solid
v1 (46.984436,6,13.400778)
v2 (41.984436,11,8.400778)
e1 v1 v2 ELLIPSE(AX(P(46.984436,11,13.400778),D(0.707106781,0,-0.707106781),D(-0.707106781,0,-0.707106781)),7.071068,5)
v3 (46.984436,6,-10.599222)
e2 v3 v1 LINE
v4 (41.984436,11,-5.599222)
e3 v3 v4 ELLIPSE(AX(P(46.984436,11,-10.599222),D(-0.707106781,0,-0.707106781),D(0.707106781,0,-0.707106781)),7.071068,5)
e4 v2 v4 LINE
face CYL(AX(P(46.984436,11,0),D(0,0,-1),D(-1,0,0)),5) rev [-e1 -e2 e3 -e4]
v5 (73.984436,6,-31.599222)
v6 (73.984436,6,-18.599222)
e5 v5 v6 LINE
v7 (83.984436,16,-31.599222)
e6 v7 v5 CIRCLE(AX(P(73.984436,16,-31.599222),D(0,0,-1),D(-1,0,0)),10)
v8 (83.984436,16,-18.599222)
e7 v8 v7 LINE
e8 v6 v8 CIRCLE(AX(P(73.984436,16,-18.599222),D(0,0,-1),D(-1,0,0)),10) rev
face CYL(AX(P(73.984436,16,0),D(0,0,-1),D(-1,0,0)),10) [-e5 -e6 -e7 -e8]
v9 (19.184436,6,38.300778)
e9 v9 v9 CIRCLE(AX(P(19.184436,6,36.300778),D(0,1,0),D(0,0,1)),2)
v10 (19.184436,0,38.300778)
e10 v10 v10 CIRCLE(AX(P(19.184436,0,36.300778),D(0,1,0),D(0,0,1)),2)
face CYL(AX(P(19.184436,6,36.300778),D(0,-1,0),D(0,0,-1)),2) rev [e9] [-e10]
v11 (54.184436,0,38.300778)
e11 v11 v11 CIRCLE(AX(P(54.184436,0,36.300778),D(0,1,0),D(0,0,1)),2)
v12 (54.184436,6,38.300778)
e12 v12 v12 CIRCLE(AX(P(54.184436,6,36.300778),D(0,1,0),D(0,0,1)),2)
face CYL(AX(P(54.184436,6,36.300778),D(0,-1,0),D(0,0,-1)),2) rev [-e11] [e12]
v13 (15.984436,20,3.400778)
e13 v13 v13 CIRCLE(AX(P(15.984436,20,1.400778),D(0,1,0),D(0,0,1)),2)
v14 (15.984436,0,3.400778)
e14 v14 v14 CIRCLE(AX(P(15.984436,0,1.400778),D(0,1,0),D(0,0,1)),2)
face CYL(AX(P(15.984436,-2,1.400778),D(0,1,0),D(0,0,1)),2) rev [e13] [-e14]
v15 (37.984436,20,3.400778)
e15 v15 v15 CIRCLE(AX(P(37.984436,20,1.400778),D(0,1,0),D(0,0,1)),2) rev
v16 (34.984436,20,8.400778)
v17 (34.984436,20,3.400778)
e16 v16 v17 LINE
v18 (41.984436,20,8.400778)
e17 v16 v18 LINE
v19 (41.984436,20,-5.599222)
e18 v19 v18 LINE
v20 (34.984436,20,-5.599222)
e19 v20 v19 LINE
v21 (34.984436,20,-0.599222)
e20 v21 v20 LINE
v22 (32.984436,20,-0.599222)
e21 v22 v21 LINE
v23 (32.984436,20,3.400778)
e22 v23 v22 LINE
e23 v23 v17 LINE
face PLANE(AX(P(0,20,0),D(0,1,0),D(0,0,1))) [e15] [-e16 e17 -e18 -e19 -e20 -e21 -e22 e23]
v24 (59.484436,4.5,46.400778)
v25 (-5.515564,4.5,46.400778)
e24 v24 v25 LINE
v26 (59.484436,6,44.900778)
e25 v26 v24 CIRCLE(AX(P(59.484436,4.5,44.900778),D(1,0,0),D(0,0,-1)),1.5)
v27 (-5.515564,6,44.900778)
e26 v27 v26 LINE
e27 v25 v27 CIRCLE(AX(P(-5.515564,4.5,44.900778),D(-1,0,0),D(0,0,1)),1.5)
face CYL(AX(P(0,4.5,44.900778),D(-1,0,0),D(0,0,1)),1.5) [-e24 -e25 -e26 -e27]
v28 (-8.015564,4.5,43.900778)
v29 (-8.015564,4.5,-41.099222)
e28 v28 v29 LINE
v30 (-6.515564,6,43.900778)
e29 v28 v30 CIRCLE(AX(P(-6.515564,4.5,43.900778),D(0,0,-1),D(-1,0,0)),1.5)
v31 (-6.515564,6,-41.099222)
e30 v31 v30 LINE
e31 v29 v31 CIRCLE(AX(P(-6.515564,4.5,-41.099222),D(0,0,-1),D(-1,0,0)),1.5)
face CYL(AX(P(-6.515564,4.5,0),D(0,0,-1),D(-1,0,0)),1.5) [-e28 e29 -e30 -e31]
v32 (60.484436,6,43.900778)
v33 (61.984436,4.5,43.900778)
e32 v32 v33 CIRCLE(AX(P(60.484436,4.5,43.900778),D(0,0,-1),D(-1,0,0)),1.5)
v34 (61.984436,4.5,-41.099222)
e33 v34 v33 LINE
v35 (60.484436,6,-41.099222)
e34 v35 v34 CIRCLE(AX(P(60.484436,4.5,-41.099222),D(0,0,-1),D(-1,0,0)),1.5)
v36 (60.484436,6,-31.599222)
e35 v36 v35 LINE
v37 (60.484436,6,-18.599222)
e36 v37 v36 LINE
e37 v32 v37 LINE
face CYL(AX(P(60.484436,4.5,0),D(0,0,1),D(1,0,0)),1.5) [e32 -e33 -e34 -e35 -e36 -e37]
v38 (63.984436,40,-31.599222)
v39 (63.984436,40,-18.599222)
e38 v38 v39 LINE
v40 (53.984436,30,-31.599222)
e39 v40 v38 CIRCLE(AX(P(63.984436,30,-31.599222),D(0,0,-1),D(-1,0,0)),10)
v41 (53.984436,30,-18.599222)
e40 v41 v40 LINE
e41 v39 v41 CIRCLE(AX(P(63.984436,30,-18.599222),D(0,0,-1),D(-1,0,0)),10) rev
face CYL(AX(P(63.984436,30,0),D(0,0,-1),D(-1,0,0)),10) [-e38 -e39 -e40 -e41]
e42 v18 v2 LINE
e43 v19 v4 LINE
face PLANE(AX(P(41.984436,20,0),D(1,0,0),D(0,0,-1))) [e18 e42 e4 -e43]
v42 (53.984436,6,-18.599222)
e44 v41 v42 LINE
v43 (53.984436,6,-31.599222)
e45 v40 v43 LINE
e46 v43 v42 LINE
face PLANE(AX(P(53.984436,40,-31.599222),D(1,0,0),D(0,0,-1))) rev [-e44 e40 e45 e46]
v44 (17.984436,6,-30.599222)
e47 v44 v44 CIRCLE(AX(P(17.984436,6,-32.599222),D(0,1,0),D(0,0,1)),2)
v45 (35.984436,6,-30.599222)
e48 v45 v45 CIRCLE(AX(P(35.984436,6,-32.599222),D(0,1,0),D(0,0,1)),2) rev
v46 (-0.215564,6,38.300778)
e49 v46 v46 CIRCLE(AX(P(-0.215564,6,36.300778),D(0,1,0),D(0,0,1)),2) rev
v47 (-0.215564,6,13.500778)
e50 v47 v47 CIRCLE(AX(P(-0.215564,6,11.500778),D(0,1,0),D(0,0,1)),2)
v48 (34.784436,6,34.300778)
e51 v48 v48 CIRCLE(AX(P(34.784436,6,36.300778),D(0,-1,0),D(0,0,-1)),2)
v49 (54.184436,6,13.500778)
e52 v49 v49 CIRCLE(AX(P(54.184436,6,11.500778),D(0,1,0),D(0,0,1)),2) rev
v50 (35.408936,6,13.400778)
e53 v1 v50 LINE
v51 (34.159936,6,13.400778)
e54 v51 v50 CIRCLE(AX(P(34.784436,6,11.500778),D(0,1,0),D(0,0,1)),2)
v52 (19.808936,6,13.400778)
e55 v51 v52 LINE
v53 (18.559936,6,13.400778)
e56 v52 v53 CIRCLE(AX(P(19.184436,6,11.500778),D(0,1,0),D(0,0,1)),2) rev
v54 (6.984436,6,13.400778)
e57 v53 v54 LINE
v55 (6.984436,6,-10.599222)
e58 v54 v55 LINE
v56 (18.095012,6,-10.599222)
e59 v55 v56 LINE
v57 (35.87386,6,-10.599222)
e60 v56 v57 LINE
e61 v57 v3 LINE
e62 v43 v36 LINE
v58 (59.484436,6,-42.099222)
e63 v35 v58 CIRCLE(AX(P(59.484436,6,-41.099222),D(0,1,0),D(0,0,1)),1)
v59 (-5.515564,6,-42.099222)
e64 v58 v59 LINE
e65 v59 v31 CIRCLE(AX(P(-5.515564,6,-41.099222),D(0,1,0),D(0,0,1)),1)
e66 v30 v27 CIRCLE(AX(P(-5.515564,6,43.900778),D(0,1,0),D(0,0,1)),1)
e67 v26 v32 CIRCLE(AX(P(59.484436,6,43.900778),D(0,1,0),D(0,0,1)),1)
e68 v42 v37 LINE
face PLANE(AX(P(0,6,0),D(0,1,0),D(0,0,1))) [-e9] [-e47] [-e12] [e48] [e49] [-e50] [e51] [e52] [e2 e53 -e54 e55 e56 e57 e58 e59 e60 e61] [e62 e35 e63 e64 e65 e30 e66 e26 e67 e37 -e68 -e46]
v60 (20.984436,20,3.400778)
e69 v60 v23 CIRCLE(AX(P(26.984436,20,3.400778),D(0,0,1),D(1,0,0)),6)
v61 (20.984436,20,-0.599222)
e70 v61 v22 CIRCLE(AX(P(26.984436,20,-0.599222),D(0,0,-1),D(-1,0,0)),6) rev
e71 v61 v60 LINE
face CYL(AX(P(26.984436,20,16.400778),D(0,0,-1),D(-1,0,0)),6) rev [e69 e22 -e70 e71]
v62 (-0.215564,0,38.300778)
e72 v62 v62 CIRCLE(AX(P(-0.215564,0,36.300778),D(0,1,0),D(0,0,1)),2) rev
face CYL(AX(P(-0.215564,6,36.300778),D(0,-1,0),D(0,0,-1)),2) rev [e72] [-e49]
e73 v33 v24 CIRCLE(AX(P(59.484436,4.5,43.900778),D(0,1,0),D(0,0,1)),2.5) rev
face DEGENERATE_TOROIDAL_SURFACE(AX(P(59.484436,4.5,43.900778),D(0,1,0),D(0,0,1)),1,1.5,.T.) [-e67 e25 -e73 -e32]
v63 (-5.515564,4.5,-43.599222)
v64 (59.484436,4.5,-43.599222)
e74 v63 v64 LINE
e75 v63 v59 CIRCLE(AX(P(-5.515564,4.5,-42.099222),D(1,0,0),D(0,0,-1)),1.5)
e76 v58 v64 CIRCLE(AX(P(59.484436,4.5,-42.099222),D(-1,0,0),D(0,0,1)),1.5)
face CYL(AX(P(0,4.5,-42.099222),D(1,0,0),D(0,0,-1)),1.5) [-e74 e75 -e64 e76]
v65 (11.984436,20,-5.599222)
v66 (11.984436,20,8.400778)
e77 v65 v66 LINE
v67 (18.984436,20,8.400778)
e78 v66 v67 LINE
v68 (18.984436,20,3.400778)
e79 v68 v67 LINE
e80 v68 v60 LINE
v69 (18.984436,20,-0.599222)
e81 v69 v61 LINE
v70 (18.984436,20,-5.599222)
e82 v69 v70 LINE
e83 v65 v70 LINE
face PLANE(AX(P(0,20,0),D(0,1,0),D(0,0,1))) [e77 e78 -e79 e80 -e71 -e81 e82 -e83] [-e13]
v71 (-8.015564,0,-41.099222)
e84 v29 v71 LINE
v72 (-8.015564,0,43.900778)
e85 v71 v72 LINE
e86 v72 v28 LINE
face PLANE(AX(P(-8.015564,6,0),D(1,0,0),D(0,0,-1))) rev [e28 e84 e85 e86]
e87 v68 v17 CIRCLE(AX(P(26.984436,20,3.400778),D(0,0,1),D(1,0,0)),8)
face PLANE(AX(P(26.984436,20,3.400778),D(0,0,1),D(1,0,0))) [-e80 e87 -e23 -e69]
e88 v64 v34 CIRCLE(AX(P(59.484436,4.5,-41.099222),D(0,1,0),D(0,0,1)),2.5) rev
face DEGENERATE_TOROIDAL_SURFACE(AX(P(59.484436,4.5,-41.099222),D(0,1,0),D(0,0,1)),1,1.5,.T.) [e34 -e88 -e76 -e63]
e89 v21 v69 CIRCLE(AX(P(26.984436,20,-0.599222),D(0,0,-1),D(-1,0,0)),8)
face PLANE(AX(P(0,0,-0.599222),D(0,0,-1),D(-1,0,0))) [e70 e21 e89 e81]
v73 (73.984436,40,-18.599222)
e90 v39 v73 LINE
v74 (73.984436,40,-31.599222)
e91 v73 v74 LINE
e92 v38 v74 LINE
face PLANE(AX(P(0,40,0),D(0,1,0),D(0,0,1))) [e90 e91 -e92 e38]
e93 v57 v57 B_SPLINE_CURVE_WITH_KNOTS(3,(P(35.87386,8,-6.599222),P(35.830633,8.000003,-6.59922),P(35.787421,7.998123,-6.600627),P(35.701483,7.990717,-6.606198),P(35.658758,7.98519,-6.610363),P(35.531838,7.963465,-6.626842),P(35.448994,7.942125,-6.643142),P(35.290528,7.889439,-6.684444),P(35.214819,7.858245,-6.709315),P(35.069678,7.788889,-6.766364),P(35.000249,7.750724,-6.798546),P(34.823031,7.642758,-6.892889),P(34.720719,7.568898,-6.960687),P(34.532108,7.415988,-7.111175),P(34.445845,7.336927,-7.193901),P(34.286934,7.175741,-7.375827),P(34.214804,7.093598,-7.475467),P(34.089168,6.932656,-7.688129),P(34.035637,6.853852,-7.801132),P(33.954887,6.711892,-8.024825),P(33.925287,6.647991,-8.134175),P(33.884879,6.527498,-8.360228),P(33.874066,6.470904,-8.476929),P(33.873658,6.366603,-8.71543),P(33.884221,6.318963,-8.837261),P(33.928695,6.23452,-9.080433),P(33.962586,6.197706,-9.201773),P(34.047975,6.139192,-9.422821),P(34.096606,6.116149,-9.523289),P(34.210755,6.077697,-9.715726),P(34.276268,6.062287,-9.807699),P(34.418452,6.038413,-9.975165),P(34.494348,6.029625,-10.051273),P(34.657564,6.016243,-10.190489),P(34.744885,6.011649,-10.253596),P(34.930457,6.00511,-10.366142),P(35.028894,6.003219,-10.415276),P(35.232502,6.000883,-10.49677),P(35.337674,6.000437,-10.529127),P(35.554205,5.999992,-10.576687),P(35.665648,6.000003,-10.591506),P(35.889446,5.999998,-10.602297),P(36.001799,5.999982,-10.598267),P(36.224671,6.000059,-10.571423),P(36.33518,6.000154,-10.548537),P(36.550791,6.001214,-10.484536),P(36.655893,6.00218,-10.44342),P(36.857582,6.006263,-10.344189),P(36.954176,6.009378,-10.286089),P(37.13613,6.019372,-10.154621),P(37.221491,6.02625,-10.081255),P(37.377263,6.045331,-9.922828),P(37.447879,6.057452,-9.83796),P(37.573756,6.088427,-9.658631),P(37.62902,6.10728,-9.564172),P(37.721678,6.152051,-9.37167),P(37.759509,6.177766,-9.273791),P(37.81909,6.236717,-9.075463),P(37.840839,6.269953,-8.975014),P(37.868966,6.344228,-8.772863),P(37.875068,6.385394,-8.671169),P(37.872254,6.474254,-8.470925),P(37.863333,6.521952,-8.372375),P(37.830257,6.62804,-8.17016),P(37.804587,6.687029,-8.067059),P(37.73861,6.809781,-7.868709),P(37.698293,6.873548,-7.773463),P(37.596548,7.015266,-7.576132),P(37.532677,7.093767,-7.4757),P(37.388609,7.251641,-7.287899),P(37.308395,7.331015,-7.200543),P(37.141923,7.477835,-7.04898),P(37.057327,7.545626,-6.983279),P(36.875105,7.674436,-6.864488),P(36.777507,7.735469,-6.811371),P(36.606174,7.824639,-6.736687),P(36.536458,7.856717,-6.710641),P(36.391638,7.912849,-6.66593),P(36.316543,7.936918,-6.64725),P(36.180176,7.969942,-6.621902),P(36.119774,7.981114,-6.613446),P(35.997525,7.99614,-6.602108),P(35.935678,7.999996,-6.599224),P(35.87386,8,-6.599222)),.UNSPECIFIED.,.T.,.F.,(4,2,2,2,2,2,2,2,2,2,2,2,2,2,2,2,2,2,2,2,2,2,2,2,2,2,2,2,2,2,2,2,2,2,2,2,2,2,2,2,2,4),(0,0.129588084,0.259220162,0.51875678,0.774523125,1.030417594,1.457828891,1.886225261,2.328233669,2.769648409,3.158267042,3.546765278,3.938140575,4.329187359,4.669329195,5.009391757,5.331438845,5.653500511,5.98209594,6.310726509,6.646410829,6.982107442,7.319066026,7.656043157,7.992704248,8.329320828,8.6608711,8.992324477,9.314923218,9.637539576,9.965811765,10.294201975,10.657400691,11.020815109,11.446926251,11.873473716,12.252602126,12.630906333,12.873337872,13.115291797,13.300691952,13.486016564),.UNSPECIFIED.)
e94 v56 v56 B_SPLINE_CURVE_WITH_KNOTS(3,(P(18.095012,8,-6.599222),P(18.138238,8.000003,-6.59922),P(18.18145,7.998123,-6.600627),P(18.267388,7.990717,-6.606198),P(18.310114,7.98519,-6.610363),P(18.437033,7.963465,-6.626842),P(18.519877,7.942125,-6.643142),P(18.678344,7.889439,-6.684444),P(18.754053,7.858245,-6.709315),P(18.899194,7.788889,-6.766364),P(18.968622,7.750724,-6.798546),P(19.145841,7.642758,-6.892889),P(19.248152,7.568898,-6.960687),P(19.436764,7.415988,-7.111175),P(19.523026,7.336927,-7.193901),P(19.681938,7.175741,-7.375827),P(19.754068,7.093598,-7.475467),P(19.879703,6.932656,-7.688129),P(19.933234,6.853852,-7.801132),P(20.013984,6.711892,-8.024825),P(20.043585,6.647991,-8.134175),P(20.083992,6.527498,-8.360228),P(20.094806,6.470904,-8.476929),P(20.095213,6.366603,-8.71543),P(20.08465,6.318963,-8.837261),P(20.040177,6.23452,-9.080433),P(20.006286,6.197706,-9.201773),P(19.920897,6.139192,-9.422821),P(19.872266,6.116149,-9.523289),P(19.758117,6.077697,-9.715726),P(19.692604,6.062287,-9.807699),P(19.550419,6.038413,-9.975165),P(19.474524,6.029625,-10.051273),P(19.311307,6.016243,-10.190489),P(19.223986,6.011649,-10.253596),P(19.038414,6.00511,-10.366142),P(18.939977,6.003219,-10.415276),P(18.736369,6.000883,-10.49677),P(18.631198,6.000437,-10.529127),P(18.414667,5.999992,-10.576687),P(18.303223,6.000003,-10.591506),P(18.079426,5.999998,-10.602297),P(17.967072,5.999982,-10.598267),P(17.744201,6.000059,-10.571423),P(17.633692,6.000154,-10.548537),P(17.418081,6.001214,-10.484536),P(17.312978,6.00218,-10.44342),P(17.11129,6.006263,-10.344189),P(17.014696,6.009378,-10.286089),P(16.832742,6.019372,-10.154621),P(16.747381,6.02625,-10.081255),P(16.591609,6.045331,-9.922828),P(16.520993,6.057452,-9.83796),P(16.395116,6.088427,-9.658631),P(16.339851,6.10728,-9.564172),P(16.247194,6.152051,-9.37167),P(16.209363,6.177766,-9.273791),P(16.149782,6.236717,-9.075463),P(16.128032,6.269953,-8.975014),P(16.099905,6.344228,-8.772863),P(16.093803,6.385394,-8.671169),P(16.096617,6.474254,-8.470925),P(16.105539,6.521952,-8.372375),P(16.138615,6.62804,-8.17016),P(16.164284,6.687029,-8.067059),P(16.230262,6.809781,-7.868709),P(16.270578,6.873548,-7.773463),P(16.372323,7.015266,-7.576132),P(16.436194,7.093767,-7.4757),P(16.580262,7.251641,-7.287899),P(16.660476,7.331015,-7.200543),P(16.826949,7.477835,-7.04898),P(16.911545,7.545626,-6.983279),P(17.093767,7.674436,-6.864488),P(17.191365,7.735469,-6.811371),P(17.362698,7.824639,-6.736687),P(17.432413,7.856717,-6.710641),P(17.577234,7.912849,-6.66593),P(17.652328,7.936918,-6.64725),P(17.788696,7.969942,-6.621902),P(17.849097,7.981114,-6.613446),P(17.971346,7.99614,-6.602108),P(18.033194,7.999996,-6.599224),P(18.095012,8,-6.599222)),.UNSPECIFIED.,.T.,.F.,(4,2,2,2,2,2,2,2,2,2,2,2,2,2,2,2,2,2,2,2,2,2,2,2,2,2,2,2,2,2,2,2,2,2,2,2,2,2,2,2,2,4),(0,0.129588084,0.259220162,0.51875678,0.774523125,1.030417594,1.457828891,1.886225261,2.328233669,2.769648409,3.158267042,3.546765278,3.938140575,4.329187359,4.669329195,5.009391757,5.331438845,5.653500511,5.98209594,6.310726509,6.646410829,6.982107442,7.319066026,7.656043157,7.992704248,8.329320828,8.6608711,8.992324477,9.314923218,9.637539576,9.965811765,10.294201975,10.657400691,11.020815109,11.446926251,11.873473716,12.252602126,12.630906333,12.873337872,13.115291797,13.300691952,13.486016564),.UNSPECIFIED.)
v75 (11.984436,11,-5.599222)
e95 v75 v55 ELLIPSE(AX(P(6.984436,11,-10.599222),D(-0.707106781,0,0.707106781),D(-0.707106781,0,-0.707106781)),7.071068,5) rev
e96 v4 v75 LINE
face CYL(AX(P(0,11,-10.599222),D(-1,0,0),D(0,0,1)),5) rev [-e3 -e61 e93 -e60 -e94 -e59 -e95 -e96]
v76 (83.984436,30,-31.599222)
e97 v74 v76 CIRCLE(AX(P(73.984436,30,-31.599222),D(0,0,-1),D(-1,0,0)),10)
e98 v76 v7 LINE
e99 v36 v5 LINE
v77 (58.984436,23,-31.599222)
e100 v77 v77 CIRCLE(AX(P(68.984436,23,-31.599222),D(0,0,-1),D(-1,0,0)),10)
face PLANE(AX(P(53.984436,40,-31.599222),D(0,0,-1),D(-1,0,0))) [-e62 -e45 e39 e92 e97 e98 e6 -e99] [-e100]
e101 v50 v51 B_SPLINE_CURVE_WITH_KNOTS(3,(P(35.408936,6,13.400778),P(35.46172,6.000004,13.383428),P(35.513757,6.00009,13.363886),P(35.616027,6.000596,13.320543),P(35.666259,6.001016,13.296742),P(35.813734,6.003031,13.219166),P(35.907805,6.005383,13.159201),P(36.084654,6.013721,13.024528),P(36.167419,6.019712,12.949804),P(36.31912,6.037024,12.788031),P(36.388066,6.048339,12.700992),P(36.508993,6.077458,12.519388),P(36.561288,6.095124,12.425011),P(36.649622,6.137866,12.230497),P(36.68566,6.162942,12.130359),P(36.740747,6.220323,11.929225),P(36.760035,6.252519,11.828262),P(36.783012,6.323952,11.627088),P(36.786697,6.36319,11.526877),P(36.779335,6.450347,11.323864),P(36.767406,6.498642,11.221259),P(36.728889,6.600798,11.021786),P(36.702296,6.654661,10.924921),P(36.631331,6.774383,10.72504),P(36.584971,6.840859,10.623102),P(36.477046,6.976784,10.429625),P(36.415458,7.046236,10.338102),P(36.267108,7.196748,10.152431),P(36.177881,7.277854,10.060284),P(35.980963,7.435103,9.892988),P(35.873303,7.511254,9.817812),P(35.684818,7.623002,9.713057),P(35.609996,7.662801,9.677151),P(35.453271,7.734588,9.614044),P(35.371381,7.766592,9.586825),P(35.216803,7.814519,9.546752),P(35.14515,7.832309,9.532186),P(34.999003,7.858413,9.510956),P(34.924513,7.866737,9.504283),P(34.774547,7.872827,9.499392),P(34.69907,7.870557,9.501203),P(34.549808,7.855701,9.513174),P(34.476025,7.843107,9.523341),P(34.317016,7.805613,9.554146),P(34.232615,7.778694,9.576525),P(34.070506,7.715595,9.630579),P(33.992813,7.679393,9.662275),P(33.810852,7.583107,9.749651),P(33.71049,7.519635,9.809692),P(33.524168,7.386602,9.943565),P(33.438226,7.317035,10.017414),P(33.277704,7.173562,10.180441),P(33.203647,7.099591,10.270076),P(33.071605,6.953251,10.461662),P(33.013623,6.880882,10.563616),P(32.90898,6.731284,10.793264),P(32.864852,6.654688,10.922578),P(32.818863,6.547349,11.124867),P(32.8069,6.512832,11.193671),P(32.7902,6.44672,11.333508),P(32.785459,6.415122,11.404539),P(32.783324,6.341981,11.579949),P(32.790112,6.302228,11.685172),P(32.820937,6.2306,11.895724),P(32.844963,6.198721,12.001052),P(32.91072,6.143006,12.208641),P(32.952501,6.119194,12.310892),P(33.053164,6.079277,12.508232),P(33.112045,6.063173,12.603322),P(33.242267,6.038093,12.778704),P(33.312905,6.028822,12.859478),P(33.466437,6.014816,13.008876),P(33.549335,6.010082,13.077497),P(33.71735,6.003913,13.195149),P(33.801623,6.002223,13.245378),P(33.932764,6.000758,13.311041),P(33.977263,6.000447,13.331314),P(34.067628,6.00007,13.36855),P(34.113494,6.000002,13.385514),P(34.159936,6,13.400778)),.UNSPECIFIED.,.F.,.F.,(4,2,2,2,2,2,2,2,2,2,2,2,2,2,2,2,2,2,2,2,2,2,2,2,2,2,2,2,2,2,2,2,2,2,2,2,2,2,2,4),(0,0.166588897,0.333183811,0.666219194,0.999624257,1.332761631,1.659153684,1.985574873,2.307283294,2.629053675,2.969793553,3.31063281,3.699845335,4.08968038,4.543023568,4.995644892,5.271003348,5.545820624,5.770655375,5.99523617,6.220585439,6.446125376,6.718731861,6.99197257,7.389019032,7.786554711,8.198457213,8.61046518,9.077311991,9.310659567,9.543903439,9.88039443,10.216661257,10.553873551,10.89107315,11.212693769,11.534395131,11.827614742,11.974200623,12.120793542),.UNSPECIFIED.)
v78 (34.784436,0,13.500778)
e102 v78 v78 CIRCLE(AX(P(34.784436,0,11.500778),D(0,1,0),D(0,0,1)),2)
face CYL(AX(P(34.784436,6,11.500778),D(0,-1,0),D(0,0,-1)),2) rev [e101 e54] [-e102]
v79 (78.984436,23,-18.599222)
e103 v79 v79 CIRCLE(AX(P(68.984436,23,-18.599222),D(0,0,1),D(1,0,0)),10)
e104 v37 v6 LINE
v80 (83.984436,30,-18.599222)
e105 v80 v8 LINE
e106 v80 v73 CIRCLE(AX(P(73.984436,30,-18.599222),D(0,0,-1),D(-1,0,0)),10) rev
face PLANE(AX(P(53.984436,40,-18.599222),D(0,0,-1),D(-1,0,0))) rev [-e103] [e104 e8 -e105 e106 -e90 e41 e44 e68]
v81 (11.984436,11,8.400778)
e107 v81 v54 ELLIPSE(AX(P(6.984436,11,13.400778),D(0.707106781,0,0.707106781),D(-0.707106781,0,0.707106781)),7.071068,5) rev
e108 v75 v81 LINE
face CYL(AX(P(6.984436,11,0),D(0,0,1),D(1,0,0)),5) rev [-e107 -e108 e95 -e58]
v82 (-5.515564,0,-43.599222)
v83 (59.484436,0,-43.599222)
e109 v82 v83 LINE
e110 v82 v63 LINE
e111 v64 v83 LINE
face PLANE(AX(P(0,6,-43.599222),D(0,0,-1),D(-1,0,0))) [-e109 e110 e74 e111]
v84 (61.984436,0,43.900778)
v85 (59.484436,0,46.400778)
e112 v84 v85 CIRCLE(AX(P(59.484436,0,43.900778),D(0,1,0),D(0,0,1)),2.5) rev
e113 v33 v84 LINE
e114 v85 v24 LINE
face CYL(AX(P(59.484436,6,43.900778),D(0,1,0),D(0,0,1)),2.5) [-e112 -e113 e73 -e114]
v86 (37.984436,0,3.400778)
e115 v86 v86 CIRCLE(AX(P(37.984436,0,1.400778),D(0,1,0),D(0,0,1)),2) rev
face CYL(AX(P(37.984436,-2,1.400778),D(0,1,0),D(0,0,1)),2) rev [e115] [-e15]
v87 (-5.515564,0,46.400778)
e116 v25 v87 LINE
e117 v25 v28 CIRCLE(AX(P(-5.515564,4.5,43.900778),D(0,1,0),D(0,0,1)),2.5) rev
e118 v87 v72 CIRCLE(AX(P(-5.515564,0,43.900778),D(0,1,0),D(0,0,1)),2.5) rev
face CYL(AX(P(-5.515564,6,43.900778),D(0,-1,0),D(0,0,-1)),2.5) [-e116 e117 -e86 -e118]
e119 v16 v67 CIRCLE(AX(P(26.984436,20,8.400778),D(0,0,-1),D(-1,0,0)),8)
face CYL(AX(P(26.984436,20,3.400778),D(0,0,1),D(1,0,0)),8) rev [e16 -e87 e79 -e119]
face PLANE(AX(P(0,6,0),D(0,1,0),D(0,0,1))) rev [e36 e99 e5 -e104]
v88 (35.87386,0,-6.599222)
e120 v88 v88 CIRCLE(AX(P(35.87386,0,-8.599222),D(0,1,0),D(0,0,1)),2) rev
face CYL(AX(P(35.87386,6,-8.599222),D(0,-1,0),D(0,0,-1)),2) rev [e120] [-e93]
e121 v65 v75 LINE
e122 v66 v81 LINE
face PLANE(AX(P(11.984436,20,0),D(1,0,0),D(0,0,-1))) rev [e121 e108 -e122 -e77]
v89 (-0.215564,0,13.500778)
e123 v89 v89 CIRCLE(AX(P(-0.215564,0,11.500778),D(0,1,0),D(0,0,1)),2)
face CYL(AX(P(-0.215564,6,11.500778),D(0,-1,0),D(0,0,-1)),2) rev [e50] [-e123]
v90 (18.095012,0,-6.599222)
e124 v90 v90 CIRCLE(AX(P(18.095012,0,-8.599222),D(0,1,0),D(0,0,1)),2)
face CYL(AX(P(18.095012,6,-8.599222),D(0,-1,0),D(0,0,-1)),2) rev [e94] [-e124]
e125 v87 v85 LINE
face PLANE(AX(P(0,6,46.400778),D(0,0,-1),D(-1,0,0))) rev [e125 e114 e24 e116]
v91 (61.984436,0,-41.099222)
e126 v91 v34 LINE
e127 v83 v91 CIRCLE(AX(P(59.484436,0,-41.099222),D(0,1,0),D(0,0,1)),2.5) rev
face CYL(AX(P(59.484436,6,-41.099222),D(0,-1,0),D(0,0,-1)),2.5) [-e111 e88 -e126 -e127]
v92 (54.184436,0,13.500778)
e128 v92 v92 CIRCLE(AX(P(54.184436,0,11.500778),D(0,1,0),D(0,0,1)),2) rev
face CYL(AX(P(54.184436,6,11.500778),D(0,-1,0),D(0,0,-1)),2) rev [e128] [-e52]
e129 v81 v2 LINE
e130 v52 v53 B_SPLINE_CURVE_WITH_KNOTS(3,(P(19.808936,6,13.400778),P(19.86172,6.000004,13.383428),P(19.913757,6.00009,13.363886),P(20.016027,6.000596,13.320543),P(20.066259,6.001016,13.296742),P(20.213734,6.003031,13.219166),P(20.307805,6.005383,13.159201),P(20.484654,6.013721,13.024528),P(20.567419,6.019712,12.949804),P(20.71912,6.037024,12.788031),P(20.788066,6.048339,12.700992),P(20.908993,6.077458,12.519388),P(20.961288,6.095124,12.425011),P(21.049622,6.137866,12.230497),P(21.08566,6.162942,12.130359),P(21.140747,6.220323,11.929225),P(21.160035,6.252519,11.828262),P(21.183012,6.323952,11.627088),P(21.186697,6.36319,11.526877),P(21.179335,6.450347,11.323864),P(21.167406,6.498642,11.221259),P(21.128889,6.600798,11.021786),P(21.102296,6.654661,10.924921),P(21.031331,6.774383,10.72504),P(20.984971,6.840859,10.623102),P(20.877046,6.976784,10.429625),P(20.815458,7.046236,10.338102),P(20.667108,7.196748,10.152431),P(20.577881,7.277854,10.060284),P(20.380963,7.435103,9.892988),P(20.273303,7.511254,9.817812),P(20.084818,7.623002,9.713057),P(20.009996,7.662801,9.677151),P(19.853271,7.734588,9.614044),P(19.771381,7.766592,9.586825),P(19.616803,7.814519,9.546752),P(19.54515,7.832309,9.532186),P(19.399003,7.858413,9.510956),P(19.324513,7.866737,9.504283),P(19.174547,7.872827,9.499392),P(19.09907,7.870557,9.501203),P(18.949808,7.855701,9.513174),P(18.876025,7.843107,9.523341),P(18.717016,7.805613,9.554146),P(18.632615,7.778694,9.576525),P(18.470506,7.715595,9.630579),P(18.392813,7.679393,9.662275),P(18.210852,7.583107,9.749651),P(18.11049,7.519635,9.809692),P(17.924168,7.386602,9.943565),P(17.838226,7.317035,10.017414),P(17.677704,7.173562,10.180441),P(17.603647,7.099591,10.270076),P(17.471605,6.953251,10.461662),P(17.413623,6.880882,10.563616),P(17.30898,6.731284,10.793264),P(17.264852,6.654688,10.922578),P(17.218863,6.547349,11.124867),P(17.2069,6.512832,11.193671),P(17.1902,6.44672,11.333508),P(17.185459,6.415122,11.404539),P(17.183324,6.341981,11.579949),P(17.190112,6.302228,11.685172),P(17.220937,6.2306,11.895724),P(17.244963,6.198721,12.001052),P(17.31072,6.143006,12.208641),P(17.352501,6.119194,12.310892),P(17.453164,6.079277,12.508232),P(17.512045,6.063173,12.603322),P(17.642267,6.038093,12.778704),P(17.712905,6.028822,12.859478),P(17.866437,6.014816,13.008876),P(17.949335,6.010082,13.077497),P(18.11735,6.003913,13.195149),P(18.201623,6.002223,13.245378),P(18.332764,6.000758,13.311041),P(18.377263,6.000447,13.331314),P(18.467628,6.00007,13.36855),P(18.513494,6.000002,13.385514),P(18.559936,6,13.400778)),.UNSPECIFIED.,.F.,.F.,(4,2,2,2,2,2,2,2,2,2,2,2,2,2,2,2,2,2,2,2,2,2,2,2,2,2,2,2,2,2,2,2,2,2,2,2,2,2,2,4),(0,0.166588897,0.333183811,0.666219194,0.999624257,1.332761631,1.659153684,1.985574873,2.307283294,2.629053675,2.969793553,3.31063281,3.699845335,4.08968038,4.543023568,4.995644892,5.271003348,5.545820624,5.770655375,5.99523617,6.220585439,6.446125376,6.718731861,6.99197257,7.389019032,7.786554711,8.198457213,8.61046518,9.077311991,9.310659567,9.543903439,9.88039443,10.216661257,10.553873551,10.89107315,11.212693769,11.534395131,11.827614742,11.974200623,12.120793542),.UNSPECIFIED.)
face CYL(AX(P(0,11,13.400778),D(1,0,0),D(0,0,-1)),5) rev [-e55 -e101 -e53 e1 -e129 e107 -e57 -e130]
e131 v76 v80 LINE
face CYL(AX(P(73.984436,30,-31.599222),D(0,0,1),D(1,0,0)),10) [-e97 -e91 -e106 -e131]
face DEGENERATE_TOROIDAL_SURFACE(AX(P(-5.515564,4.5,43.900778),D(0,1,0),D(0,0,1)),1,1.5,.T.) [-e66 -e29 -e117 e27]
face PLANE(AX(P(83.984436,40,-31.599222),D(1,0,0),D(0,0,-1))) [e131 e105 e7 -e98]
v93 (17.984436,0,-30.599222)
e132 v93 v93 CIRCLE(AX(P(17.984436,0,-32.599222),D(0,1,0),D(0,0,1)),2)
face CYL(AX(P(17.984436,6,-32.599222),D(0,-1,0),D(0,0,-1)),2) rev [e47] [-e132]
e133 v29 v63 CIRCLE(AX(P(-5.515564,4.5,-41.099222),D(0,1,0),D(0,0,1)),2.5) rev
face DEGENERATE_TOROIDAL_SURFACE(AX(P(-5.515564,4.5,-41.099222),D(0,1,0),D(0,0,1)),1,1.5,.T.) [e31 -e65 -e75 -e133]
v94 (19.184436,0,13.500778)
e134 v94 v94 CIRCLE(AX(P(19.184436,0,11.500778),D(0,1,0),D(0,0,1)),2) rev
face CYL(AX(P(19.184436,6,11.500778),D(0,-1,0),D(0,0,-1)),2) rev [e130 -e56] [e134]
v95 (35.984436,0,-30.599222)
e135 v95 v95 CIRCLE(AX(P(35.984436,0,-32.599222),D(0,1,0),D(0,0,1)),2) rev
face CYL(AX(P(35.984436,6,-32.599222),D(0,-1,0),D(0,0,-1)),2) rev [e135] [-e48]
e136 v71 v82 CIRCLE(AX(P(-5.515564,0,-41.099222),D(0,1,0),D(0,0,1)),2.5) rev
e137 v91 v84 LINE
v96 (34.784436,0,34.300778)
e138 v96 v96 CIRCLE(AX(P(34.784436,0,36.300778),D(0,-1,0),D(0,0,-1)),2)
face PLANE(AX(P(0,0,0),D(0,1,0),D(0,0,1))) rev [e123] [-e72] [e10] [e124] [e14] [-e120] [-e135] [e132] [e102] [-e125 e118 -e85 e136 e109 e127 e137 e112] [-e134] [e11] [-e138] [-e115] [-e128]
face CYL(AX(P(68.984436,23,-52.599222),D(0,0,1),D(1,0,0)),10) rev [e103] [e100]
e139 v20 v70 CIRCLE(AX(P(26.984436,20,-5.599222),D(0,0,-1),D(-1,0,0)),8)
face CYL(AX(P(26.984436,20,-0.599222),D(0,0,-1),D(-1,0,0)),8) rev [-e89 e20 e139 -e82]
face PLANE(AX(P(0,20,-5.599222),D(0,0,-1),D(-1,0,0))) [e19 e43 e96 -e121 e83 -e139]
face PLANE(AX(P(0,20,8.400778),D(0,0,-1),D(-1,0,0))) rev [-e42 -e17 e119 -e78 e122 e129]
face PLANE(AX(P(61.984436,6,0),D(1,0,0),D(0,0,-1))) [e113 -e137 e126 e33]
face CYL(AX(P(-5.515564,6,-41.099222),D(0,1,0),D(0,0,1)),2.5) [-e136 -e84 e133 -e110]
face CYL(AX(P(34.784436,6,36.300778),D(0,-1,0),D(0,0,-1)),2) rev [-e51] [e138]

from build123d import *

# Parameters (mm, degrees)
SKETCH1_W           = 70
SKETCH1_H           = 90
SKETCH1_R           = 2
BOSS_EXTRUDE1_DEPTH = 6
SKETCH3_W           = 15
SKETCH3_H           = 7
BOSS_EXTRUDE2_DEPTH = 14
FILLET1_R           = 2.5
FILLET2_R           = 1.5
CUT_EXTRUDE1_DEPTH  = 22
SKETCH5_R           = 6
CUT_EXTRUDE2_DEPTH  = 22
CUT_EXTRUDE4_DEPTH  = 5
CUT_EXTRUDE5_START  = -5
SKETCH9_R           = 8
SKETCH9_R_2         = 6
CUT_EXTRUDE5_DEPTH  = 5
FILLET3_R           = 5
SKETCH10_W          = 30
SKETCH10_H          = 13
BOSS_EXTRUDE5_DEPTH = 34
CUT_EXTRUDE6_DEPTH  = 34
FILLET5_R           = 10


with BuildPart() as part:
    # Sketch1 → Boss-Extrude1 (new body)
    with BuildSketch(Plane(origin=(0, 0, 0), x_dir=(1, 0, 0), z_dir=(0, 1, 0))):
        with Locations((26.984435798, -1.40077821)):
            Rectangle(SKETCH1_W, SKETCH1_H)
        with Locations(Location((17.984435798, 32.59922179, 0), (0, 0, 270))):
            Circle(SKETCH1_R, mode=Mode.SUBTRACT)
        with Locations(Location((18.095011811, 8.59922179, 0), (0, 0, 270))):
            Circle(SKETCH1_R, mode=Mode.SUBTRACT)
        with Locations(Location((35.873859784, 8.59922179, 0), (0, 0, 270))):
            Circle(SKETCH1_R, mode=Mode.SUBTRACT)
        with Locations(Location((35.984435798, 32.59922179, 0), (0, 0, 270))):
            Circle(SKETCH1_R, mode=Mode.SUBTRACT)
        with Locations(Location((19.184435798, -11.50077821, 0), (0, 0, 270))):
            Circle(SKETCH1_R, mode=Mode.SUBTRACT)
        with Locations(Location((-0.215564202, -11.50077821, 0), (0, 0, 270))):
            Circle(SKETCH1_R, mode=Mode.SUBTRACT)
        with Locations(Location((-0.215564202, -36.30077821, 0), (0, 0, 270))):
            Circle(SKETCH1_R, mode=Mode.SUBTRACT)
        with Locations(Location((19.184435798, -36.30077821, 0), (0, 0, 270))):
            Circle(SKETCH1_R, mode=Mode.SUBTRACT)
        with Locations(Location((54.184435798, -36.30077821, 0), (0, 0, 270))):
            Circle(SKETCH1_R, mode=Mode.SUBTRACT)
        with Locations(Location((34.784435798, -36.30077821, 0), (0, 0, 90))):
            Circle(SKETCH1_R, mode=Mode.SUBTRACT)
        with Locations(Location((34.784435798, -11.50077821, 0), (0, 0, 270))):
            Circle(SKETCH1_R, mode=Mode.SUBTRACT)
        with Locations(Location((54.184435798, -11.50077821, 0), (0, 0, 270))):
            Circle(SKETCH1_R, mode=Mode.SUBTRACT)
    extrude(amount=BOSS_EXTRUDE1_DEPTH)

    # Sketch3 → Boss-Extrude2 (add)
    with BuildSketch(Plane(origin=(0, 6, 0), x_dir=(1, 0, 0), z_dir=(0, 1, 0))):
        with Locations((19.484435798, 2.09922179)):
            Rectangle(SKETCH3_W, SKETCH3_H)
        with Locations((34.484435798, 2.09922179)):
            Rectangle(SKETCH3_W, SKETCH3_H)
        with Locations((34.484435798, -4.90077821)):
            Rectangle(SKETCH3_W, SKETCH3_H)
        with Locations((19.484435798, -4.90077821)):
            Rectangle(SKETCH3_W, SKETCH3_H)
    extrude(amount=BOSS_EXTRUDE2_DEPTH)

    # Fillet1
    fillet1_edges = [part.edges().sort_by_distance(p)[0] for p in [
        (-8.015564202, 3, 46.40077821),
        (-8.015564202, 3, -43.59922179),
        (61.984435798, 3, -43.59922179),
        (61.984435798, 3, 46.40077821),
    ]]
    fillet(fillet1_edges, radius=FILLET1_R)

    # Fillet2
    fillet2_edges = [part.edges().sort_by_distance(p)[0] for p in [
        (-8.015564202, 6, 1.40077821),
        (26.984435798, 6, -43.59922179),
        (26.984435798, 6, 46.40077821),
        (61.984435798, 6, 1.40077821),
        (-7.283331155, 6, 45.668545163),
        (61.252202751, 6, 45.668545163),
        (61.252202751, 6, -42.866988743),
        (-7.283331155, 6, -42.866988743),
    ]]
    fillet(fillet2_edges, radius=FILLET2_R)

    # Sketch4 → Cut-Extrude1 (cut)
    with BuildSketch(Plane(origin=(0, 20, 0), x_dir=(1, 0, 0), z_dir=(0, 1, 0))):
        with BuildLine():
            ThreePointArc((17.984435798, -1.40077821), (15.984435798, 0.59922179), (13.984435798, -1.40077821))
            Line((13.984435798, -1.40077821), (17.984435798, -1.40077821))
        make_face()
        with BuildLine():
            Line((17.984435798, -1.40077821), (13.984435798, -1.40077821))
            ThreePointArc((13.984435798, -1.40077821), (15.984435798, -3.40077821), (17.984435798, -1.40077821))
        make_face()
        with BuildLine():
            ThreePointArc((39.984435798, -1.40077821), (37.984435798, 0.59922179), (35.984435798, -1.40077821))
            Line((35.984435798, -1.40077821), (39.984435798, -1.40077821))
        make_face()
        with BuildLine():
            Line((39.984435798, -1.40077821), (35.984435798, -1.40077821))
            ThreePointArc((35.984435798, -1.40077821), (37.984435798, -3.40077821), (39.984435798, -1.40077821))
        make_face()
    extrude(amount=-CUT_EXTRUDE1_DEPTH, mode=Mode.SUBTRACT)

    # Sketch5 → Cut-Extrude2 (cut)
    with BuildSketch(Plane(origin=(0, 0, -5.59922179), x_dir=(-1, 0, 0), z_dir=(0, 0, -1))):
        with Locations((-26.984435798, 20)):
            Circle(SKETCH5_R)
    extrude(amount=-CUT_EXTRUDE2_DEPTH, mode=Mode.SUBTRACT)

    # Sketch6 → Cut-Extrude4 (cut)
    with BuildSketch(Plane(origin=(0, 0, -5.59922179), x_dir=(-1, 0, 0), z_dir=(0, 0, -1))):
        with BuildLine():
            ThreePointArc((-34.984435798, 20), (-26.984435798, 12), (-18.984435798, 20))
            Line((-18.984435798, 20), (-20.984435798, 20))
            ThreePointArc((-20.984435798, 20), (-26.984435798, 14), (-32.984435798, 20))
            Line((-32.984435798, 20), (-34.984435798, 20))
        make_face()
    extrude(amount=-CUT_EXTRUDE4_DEPTH, mode=Mode.SUBTRACT)

    # Sketch9 → Cut-Extrude5 (cut)
    with BuildSketch(Plane.XY.offset(8.40077821).offset(CUT_EXTRUDE5_START)):
        with Locations((26.984435798, 20)):
            Circle(SKETCH9_R)
        with Locations((26.984435798, 20)):
            Circle(SKETCH9_R_2, mode=Mode.SUBTRACT)
    extrude(amount=CUT_EXTRUDE5_DEPTH, mode=Mode.SUBTRACT)

    # Fillet3
    # the kernel refuses this fillet: 5 mm, written as the material it adds along each edge
    with BuildSketch(Plane(origin=(41.984435798, 6, 8.40077821), x_dir=(0, 0, 1), z_dir=(-1, 0, 0))) as fillet3_piece_1_section:
        with BuildLine():
            CenterArc((FILLET3_R, FILLET3_R), FILLET3_R, 180, 90)
            Line((0, FILLET3_R), (0, 0))
            Line((0, 0), (FILLET3_R, 0))
        make_face()
    fillet3_piece_1 = extrude(amount=30, mode=Mode.PRIVATE)
    fillet3_piece_1 = fillet3_piece_1 - Plane(origin=(34.784435798, 7.197458463, 11.50077821), x_dir=(0, 0, 1), z_dir=(0, -1, 0)) * Cylinder(2, 80, mode=Mode.PRIVATE)
    fillet3_piece_1 = fillet3_piece_1 - Plane(origin=(19.184435798, 7.197458463, 11.50077821), x_dir=(0, 0, 1), z_dir=(0, -1, 0)) * Cylinder(2, 80, mode=Mode.PRIVATE)
    add(fillet3_piece_1)
    with BuildSketch(Plane(origin=(11.984435798, 6, -5.59922179), x_dir=(-1, 0, 0), z_dir=(0, 0, 1))) as fillet3_piece_2:
        with BuildLine():
            CenterArc((FILLET3_R, -FILLET3_R), FILLET3_R, 90, 90)
            Line((0, -FILLET3_R), (0, 0))
            Line((0, 0), (FILLET3_R, 0))
        make_face()
    extrude(amount=14)
    with BuildSketch(Plane(origin=(41.984435798, 6, -5.59922179), x_dir=(0, 0, -1), z_dir=(-1, 0, 0))) as fillet3_piece_3_section:
        with BuildLine():
            CenterArc((FILLET3_R, -FILLET3_R), FILLET3_R, 90, 90)
            Line((0, -FILLET3_R), (0, 0))
            Line((0, 0), (FILLET3_R, 0))
        make_face()
    fillet3_piece_3 = extrude(amount=30, mode=Mode.PRIVATE)
    fillet3_piece_3 = fillet3_piece_3 - Plane(origin=(35.873859784, 7.200103182, -8.59922179), x_dir=(0, 0, 1), z_dir=(0, -1, 0)) * Cylinder(2, 80, mode=Mode.PRIVATE)
    fillet3_piece_3 = fillet3_piece_3 - Plane(origin=(18.095011811, 7.200103182, -8.59922179), x_dir=(0, 0, 1), z_dir=(0, -1, 0)) * Cylinder(2, 80, mode=Mode.PRIVATE)
    add(fillet3_piece_3)
    with BuildSketch(Plane(origin=(41.984435798, 6, -5.59922179), x_dir=(1, 0, 0), z_dir=(0, 0, 1))) as fillet3_piece_4:
        with BuildLine():
            CenterArc((FILLET3_R, FILLET3_R), FILLET3_R, 180, 90)
            Line((0, FILLET3_R), (0, 0))
            Line((0, 0), (FILLET3_R, 0))
        make_face()
    extrude(amount=14)
    with BuildSketch(Plane(origin=(41.984435798, 6, -5.59922179), x_dir=(1, 0, 0), z_dir=(0, 0, 1))) as fillet3_piece_5a_section:
        with BuildLine():
            CenterArc((FILLET3_R, FILLET3_R), FILLET3_R, 180, 90)
            Line((0, FILLET3_R), (0, 0))
            Line((0, 0), (FILLET3_R, 0))
        make_face()
    fillet3_piece_5a = extrude(amount=26.5, mode=Mode.PRIVATE)
    fillet3_piece_5a = split(fillet3_piece_5a, bisect_by=Plane(origin=(43.116411369, 7.131975571, 8.40077821), z_dir=(0, 0, 1)), keep=Keep.TOP, mode=Mode.PRIVATE)
    with BuildSketch(Plane(origin=(54.484435798, 6, 8.40077821), x_dir=(0, 0, 1), z_dir=(-1, 0, 0))) as fillet3_piece_5b_section:
        with BuildLine():
            CenterArc((FILLET3_R, FILLET3_R), FILLET3_R, 180, 90)
            Line((0, FILLET3_R), (0, 0))
            Line((0, 0), (FILLET3_R, 0))
        make_face()
    fillet3_piece_5b = extrude(amount=42.5, mode=Mode.PRIVATE)
    fillet3_piece_5b = fillet3_piece_5b - Plane(origin=(54.184435798, 7.177432689, 11.50077821), x_dir=(0, 0, 1), z_dir=(0, -1, 0)) * Cylinder(2, 105, mode=Mode.PRIVATE)
    fillet3_piece_5b = split(fillet3_piece_5b, bisect_by=Plane(origin=(41.984435798, 7.177432689, 9.458456652), z_dir=(1, 0, 0)), keep=Keep.TOP, mode=Mode.PRIVATE)
    fillet3_piece_5 = fillet3_piece_5a & fillet3_piece_5b
    add(fillet3_piece_5)
    with BuildSketch(Plane(origin=(41.984435798, 6, 8.40077821), x_dir=(0, 0, 1), z_dir=(-1, 0, 0))) as fillet3_piece_6a_section:
        with BuildLine():
            CenterArc((FILLET3_R, FILLET3_R), FILLET3_R, 180, 90)
            Line((0, FILLET3_R), (0, 0))
            Line((0, 0), (FILLET3_R, 0))
        make_face()
    fillet3_piece_6a = extrude(amount=42.5, mode=Mode.PRIVATE)
    fillet3_piece_6a = fillet3_piece_6a - Plane(origin=(-0.215564202, 7.17743263, 11.50077821), x_dir=(0, 0, 1), z_dir=(0, -1, 0)) * Cylinder(2, 105, mode=Mode.PRIVATE)
    fillet3_piece_6a = split(fillet3_piece_6a, bisect_by=Plane(origin=(11.984435798, 7.17743263, 9.458456401), z_dir=(-1, 0, 0)), keep=Keep.TOP, mode=Mode.PRIVATE)
    with BuildSketch(Plane(origin=(11.984435798, 6, -5.59922179), x_dir=(-1, 0, 0), z_dir=(0, 0, 1))) as fillet3_piece_6b_section:
        with BuildLine():
            CenterArc((FILLET3_R, -FILLET3_R), FILLET3_R, 90, 90)
            Line((0, -FILLET3_R), (0, 0))
            Line((0, 0), (FILLET3_R, 0))
        make_face()
    fillet3_piece_6b = extrude(amount=26.5, mode=Mode.PRIVATE)
    fillet3_piece_6b = split(fillet3_piece_6b, bisect_by=Plane(origin=(10.852460226, 7.131975571, 8.40077821), z_dir=(0, 0, 1)), keep=Keep.TOP, mode=Mode.PRIVATE)
    fillet3_piece_6 = fillet3_piece_6a & fillet3_piece_6b
    add(fillet3_piece_6)
    with BuildSketch(Plane(origin=(11.984435798, 6, -18.09922179), x_dir=(-1, 0, 0), z_dir=(0, 0, 1))) as fillet3_piece_7a_section:
        with BuildLine():
            CenterArc((FILLET3_R, -FILLET3_R), FILLET3_R, 90, 90)
            Line((0, -FILLET3_R), (0, 0))
            Line((0, 0), (FILLET3_R, 0))
        make_face()
    fillet3_piece_7a = extrude(amount=26.5, mode=Mode.PRIVATE)
    fillet3_piece_7a = split(fillet3_piece_7a, bisect_by=Plane(origin=(10.852460226, 7.131975571, -5.59922179), z_dir=(0, 0, -1)), keep=Keep.TOP, mode=Mode.PRIVATE)
    with BuildSketch(Plane(origin=(41.984435798, 6, -5.59922179), x_dir=(0, 0, -1), z_dir=(-1, 0, 0))) as fillet3_piece_7b_section:
        with BuildLine():
            CenterArc((FILLET3_R, -FILLET3_R), FILLET3_R, 90, 90)
            Line((0, -FILLET3_R), (0, 0))
            Line((0, 0), (FILLET3_R, 0))
        make_face()
    fillet3_piece_7b = extrude(amount=42.5, mode=Mode.PRIVATE)
    fillet3_piece_7b = split(fillet3_piece_7b, bisect_by=Plane(origin=(11.984435798, 7.131975571, -6.731197361), z_dir=(-1, 0, 0)), keep=Keep.TOP, mode=Mode.PRIVATE)
    fillet3_piece_7 = fillet3_piece_7a & fillet3_piece_7b
    add(fillet3_piece_7)
    with BuildSketch(Plane(origin=(41.984435798, 6, -18.09922179), x_dir=(1, 0, 0), z_dir=(0, 0, 1))) as fillet3_piece_8a_section:
        with BuildLine():
            CenterArc((FILLET3_R, FILLET3_R), FILLET3_R, 180, 90)
            Line((0, FILLET3_R), (0, 0))
            Line((0, 0), (FILLET3_R, 0))
        make_face()
    fillet3_piece_8a = extrude(amount=26.5, mode=Mode.PRIVATE)
    fillet3_piece_8a = split(fillet3_piece_8a, bisect_by=Plane(origin=(43.116411369, 7.131975571, -5.59922179), z_dir=(0, 0, -1)), keep=Keep.TOP, mode=Mode.PRIVATE)
    with BuildSketch(Plane(origin=(54.484435798, 6, -5.59922179), x_dir=(0, 0, -1), z_dir=(-1, 0, 0))) as fillet3_piece_8b_section:
        with BuildLine():
            CenterArc((FILLET3_R, -FILLET3_R), FILLET3_R, 90, 90)
            Line((0, -FILLET3_R), (0, 0))
            Line((0, 0), (FILLET3_R, 0))
        make_face()
    fillet3_piece_8b = extrude(amount=42.5, mode=Mode.PRIVATE)
    fillet3_piece_8b = split(fillet3_piece_8b, bisect_by=Plane(origin=(41.984435798, 7.131975571, -6.731197361), z_dir=(1, 0, 0)), keep=Keep.TOP, mode=Mode.PRIVATE)
    fillet3_piece_8 = fillet3_piece_8a & fillet3_piece_8b
    add(fillet3_piece_8)

    # Sketch10 → Boss-Extrude5 (add)
    with BuildSketch(Plane(origin=(0, 6, 0), x_dir=(1, 0, 0), z_dir=(0, 1, 0))):
        with Locations((68.984435798, 25.09922179)):
            Rectangle(SKETCH10_W, SKETCH10_H)
    extrude(amount=BOSS_EXTRUDE5_DEPTH)

    # Sketch13 → Cut-Extrude6 (cut)
    with BuildSketch(Plane.XY.offset(-18.59922179)):
        with BuildLine():
            ThreePointArc((78.984435798, 23), (76.05550361, 30.071067812), (68.984435798, 33))
            Line((68.984435798, 33), (68.984435798, 23))
            Line((68.984435798, 23), (78.984435798, 23))
        make_face()
        with BuildLine():
            Line((68.984435798, 23), (68.984435798, 33))
            ThreePointArc((68.984435798, 33), (61.913367986, 30.071067812), (58.984435798, 23))
            Line((58.984435798, 23), (68.984435798, 23))
        make_face()
        with BuildLine():
            Line((78.984435798, 23), (68.984435798, 23))
            Line((68.984435798, 23), (68.984435798, 13))
            ThreePointArc((68.984435798, 13), (76.05550361, 15.928932188), (78.984435798, 23))
        make_face()
        with BuildLine():
            Line((68.984435798, 13), (68.984435798, 23))
            Line((68.984435798, 23), (58.984435798, 23))
            ThreePointArc((58.984435798, 23), (61.913367986, 15.928932188), (68.984435798, 13))
        make_face()
    extrude(amount=-CUT_EXTRUDE6_DEPTH, mode=Mode.SUBTRACT)

    # Fillet5
    fillet5_edges = [part.edges().sort_by_distance(p)[0] for p in [
        (83.984435798, 6, -25.09922179),
        (83.984435798, 40, -25.09922179),
        (53.984435798, 40, -25.09922179),
    ]]
    fillet(fillet5_edges, radius=FILLET5_R)


solid = part.part
